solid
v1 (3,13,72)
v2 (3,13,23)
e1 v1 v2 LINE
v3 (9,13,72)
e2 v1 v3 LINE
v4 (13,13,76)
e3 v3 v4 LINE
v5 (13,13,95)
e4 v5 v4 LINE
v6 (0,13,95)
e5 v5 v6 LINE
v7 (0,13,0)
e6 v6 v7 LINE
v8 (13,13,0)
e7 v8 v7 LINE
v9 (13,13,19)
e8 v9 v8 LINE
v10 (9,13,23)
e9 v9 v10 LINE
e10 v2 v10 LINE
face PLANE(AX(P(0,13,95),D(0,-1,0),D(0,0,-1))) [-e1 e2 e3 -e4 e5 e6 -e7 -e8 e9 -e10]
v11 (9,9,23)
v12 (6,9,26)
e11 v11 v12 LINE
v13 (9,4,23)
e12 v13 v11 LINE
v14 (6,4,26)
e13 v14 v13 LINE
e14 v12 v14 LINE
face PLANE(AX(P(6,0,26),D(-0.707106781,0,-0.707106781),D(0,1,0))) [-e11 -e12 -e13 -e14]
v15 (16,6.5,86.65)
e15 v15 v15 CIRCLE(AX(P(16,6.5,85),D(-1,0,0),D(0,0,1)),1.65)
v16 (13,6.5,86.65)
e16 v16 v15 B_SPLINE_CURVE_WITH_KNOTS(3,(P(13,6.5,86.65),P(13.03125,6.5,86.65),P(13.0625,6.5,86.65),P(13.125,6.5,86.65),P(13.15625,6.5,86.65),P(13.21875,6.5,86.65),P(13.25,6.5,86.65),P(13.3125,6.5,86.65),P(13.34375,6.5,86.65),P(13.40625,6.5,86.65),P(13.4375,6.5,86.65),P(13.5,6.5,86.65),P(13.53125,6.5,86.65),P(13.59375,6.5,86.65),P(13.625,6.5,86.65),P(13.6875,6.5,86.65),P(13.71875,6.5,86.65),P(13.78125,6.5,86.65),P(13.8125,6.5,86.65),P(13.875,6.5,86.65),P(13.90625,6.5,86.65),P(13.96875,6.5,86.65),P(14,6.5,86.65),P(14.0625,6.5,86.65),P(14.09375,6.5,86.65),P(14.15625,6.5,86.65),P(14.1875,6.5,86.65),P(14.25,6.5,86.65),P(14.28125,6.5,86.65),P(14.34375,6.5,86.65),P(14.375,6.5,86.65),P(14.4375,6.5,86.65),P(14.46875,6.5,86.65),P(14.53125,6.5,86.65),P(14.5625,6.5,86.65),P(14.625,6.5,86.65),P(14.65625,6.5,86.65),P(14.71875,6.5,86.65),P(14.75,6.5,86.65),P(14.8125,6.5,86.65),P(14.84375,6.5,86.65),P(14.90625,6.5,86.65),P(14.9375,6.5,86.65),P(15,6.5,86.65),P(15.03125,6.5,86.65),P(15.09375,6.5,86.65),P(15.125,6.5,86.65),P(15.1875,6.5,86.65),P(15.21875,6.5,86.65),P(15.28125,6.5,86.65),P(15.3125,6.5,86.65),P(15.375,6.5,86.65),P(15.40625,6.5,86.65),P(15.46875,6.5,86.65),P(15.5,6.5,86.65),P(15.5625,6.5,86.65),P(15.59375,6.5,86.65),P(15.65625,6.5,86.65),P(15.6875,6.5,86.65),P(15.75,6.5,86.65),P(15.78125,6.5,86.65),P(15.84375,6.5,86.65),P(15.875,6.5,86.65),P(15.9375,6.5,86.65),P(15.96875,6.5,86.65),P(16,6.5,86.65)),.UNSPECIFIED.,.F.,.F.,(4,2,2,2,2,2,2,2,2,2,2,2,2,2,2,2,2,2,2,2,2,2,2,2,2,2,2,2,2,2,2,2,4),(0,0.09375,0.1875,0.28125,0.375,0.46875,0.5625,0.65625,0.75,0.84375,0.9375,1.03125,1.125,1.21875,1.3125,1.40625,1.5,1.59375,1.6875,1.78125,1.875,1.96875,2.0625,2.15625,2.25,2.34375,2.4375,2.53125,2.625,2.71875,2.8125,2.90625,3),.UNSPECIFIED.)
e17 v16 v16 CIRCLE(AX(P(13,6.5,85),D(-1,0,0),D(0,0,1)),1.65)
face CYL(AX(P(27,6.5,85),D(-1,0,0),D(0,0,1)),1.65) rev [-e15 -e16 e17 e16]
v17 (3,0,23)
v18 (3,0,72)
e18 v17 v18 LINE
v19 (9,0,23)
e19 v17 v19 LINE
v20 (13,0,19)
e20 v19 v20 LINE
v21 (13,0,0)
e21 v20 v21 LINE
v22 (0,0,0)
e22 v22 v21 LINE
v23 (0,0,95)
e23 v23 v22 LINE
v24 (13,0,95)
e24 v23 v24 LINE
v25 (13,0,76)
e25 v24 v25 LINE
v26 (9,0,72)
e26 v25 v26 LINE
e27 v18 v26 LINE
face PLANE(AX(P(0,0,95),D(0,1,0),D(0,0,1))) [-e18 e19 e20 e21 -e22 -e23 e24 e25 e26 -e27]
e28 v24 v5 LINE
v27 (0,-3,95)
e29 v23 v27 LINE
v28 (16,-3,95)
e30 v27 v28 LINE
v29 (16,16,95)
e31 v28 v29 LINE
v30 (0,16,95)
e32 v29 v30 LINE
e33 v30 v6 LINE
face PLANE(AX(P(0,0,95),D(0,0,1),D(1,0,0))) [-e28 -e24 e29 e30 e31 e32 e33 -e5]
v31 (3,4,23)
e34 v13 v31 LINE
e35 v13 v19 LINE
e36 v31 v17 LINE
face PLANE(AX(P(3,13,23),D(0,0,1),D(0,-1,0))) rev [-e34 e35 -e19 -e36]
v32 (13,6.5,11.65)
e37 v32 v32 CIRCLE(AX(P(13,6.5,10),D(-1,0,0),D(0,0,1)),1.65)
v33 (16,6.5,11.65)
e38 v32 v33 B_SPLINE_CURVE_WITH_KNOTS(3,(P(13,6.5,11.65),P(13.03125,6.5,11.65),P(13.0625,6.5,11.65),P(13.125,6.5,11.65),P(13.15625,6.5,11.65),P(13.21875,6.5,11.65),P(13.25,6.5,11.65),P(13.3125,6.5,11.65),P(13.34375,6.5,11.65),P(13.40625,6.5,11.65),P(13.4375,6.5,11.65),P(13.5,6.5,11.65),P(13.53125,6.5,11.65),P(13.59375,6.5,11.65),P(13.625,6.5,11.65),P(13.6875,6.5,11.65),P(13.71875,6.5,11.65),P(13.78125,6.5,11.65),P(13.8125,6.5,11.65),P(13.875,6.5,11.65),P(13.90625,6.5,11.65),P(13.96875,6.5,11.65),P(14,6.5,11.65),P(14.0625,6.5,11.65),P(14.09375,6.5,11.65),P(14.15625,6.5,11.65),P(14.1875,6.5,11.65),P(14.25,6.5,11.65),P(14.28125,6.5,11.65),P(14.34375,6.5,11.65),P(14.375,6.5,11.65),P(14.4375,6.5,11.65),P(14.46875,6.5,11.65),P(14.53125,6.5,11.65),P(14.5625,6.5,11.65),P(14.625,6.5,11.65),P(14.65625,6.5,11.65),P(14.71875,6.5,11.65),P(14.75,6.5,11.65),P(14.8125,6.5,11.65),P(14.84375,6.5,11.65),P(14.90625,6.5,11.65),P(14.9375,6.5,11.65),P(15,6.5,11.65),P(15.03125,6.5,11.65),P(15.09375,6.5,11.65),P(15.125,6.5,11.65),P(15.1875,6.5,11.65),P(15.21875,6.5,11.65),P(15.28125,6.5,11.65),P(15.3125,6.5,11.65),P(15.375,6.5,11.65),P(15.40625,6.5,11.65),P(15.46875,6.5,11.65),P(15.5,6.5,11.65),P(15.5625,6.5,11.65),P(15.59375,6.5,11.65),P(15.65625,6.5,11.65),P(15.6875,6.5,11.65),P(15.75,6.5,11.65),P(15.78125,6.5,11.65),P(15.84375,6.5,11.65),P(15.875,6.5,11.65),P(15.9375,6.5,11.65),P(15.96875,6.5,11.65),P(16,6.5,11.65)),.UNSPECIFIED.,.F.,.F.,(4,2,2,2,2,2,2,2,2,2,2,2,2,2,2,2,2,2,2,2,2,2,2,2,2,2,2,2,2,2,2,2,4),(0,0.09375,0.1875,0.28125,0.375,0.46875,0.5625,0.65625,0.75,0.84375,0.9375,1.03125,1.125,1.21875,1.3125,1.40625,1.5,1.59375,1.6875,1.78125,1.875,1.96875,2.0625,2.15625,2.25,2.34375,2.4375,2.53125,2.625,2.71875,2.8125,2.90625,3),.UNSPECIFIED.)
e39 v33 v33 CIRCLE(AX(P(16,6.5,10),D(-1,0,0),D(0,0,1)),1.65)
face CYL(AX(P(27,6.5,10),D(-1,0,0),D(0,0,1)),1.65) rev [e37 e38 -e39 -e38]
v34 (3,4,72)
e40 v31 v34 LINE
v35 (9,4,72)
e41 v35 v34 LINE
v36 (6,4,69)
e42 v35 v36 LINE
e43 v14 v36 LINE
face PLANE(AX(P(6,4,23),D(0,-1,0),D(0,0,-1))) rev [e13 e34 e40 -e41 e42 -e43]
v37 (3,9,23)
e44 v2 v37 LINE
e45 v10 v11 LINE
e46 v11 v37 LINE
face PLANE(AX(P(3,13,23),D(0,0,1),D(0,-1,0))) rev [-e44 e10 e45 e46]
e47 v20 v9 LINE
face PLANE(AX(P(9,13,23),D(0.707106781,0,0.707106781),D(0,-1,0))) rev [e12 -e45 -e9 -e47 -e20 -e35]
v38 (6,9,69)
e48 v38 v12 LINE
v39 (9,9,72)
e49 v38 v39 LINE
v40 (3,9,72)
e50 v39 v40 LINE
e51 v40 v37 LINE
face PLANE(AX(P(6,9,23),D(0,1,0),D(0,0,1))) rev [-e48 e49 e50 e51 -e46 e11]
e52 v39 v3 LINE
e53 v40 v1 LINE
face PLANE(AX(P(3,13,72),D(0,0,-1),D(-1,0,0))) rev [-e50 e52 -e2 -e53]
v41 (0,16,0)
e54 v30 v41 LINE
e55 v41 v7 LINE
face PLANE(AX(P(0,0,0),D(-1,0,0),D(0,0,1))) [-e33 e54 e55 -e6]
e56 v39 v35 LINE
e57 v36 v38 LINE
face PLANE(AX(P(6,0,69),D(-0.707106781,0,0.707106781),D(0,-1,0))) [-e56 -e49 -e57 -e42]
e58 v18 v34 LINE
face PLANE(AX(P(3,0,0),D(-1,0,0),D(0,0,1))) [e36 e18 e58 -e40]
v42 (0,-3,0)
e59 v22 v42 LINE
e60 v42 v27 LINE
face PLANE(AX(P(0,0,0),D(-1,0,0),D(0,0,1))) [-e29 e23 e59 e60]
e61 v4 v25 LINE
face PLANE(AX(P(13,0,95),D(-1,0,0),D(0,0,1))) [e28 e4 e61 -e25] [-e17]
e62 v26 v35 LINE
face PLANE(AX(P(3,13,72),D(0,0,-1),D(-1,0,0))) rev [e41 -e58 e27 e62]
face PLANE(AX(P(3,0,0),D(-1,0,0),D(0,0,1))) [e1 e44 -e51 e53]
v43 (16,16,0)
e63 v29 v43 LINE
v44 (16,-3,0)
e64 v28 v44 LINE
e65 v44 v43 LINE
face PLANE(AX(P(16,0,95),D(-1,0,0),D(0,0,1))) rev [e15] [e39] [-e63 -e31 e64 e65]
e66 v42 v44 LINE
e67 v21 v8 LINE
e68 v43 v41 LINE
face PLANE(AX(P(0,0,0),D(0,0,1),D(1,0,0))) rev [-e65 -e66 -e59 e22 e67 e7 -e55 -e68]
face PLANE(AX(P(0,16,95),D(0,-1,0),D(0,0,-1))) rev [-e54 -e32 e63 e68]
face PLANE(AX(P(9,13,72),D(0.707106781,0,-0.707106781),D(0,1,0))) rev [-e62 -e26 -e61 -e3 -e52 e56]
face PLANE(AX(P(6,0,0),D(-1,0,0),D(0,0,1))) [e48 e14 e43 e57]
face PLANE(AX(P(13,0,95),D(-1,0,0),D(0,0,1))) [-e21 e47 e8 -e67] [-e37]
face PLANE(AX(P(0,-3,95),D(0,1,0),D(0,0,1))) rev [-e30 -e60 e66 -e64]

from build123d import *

# Parameters (mm, degrees)
SKETCH_1_W          = 19
SKETCH_1_H          = 19
SKETCH_1_W_2        = 13
SKETCH_1_H_2        = 13
EXTRUDE_1_DEPTH     = 95
SKETCH_2_R          = 1.65
CUT_EXTRUDE_1_DEPTH = 30
SKETCH_3_W          = 116.915177823
SKETCH_3_H          = 46.219516436
CUT_EXTRUDE_2_DEPTH = 3
SKETCH_4_W          = 5
SKETCH_4_H          = 13
EXTRUDE_1_2_DEPTH   = 10
SKETCH_5_W          = 39
SKETCH_5_H          = 5
EXTRUDE_2_DEPTH     = 10
SKETCH_6_W          = 49
SKETCH_6_H          = 13
EXTRUDE_3_DEPTH     = 10
SKETCH_8_W          = 49
SKETCH_8_H          = 5
CUT_EXTRUDE_3_DEPTH = 3
CHAMFER_1_SIZE      = 3
CHAMFER_2_SIZE      = 4


with BuildPart() as part:
    # 草图1 → Extrude 1 (new body)
    with BuildSketch(Plane.XY):
        with Locations((6.5, 6.5)):
            Rectangle(SKETCH_1_W, SKETCH_1_H)
        with Locations((6.5, 6.5)):
            Rectangle(SKETCH_1_W_2, SKETCH_1_H_2, mode=Mode.SUBTRACT)
    extrude(amount=EXTRUDE_1_DEPTH)

    # 草图2 → 切除-拉伸1 (cut)
    with BuildSketch(Plane.ZY.offset(3)):
        with Locations((10, 6.5)):
            Circle(SKETCH_2_R)
        with Locations((85, 6.5)):
            Circle(SKETCH_2_R)
    extrude(amount=-CUT_EXTRUDE_1_DEPTH, mode=Mode.SUBTRACT)

    # 草图3 → 切除-拉伸2 (cut)
    with BuildSketch(Plane.ZY.offset(3)):
        with Locations((53.162237228, 0.202739406)):
            Rectangle(SKETCH_3_W, SKETCH_3_H)
    extrude(amount=-CUT_EXTRUDE_2_DEPTH, mode=Mode.SUBTRACT)

    # 草图4 → Extrude 1 2 (add)
    with BuildSketch(Plane.ZY.offset(-13)):
        with Locations((25.5, 6.5)):
            Rectangle(SKETCH_4_W, SKETCH_4_H)
        with Locations((69.5, 6.5)):
            Rectangle(SKETCH_4_W, SKETCH_4_H)
    extrude(amount=EXTRUDE_1_2_DEPTH)

    # 草图5 → 凸台-拉伸2 (add)
    with BuildSketch(Plane.ZY.offset(-13)):
        with Locations((47.5, 6.5)):
            Rectangle(SKETCH_5_W, SKETCH_5_H)
    extrude(amount=EXTRUDE_2_DEPTH)

    # 草图6 → 凸台-拉伸3 (add)
    with BuildSketch(Plane.ZY.offset(-13)):
        with Locations((47.5, 6.5)):
            Rectangle(SKETCH_6_W, SKETCH_6_H)
    extrude(amount=EXTRUDE_3_DEPTH)

    # 草图8 → 切除-拉伸3 (cut)
    with BuildSketch(Plane.ZY.offset(-3)):
        with Locations((47.5, 6.5)):
            Rectangle(SKETCH_8_W, SKETCH_8_H)
    extrude(amount=-CUT_EXTRUDE_3_DEPTH, mode=Mode.SUBTRACT)

    # 倒角1
    chamfer_1_edges = [part.edges().sort_by_distance(p)[0] for p in [
        (6, 6.5, 23),
        (6, 6.5, 72),
    ]]
    chamfer(chamfer_1_edges, length=CHAMFER_1_SIZE)

    # 倒角2
    chamfer_2_edges = [part.edges().sort_by_distance(p)[0] for p in [
        (13, 6.5, 23),
        (13, 6.5, 72),
    ]]
    chamfer(chamfer_2_edges, length=CHAMFER_2_SIZE - 0.0001)  # a hair under: the kernel refuses the full size


solid = part.part
